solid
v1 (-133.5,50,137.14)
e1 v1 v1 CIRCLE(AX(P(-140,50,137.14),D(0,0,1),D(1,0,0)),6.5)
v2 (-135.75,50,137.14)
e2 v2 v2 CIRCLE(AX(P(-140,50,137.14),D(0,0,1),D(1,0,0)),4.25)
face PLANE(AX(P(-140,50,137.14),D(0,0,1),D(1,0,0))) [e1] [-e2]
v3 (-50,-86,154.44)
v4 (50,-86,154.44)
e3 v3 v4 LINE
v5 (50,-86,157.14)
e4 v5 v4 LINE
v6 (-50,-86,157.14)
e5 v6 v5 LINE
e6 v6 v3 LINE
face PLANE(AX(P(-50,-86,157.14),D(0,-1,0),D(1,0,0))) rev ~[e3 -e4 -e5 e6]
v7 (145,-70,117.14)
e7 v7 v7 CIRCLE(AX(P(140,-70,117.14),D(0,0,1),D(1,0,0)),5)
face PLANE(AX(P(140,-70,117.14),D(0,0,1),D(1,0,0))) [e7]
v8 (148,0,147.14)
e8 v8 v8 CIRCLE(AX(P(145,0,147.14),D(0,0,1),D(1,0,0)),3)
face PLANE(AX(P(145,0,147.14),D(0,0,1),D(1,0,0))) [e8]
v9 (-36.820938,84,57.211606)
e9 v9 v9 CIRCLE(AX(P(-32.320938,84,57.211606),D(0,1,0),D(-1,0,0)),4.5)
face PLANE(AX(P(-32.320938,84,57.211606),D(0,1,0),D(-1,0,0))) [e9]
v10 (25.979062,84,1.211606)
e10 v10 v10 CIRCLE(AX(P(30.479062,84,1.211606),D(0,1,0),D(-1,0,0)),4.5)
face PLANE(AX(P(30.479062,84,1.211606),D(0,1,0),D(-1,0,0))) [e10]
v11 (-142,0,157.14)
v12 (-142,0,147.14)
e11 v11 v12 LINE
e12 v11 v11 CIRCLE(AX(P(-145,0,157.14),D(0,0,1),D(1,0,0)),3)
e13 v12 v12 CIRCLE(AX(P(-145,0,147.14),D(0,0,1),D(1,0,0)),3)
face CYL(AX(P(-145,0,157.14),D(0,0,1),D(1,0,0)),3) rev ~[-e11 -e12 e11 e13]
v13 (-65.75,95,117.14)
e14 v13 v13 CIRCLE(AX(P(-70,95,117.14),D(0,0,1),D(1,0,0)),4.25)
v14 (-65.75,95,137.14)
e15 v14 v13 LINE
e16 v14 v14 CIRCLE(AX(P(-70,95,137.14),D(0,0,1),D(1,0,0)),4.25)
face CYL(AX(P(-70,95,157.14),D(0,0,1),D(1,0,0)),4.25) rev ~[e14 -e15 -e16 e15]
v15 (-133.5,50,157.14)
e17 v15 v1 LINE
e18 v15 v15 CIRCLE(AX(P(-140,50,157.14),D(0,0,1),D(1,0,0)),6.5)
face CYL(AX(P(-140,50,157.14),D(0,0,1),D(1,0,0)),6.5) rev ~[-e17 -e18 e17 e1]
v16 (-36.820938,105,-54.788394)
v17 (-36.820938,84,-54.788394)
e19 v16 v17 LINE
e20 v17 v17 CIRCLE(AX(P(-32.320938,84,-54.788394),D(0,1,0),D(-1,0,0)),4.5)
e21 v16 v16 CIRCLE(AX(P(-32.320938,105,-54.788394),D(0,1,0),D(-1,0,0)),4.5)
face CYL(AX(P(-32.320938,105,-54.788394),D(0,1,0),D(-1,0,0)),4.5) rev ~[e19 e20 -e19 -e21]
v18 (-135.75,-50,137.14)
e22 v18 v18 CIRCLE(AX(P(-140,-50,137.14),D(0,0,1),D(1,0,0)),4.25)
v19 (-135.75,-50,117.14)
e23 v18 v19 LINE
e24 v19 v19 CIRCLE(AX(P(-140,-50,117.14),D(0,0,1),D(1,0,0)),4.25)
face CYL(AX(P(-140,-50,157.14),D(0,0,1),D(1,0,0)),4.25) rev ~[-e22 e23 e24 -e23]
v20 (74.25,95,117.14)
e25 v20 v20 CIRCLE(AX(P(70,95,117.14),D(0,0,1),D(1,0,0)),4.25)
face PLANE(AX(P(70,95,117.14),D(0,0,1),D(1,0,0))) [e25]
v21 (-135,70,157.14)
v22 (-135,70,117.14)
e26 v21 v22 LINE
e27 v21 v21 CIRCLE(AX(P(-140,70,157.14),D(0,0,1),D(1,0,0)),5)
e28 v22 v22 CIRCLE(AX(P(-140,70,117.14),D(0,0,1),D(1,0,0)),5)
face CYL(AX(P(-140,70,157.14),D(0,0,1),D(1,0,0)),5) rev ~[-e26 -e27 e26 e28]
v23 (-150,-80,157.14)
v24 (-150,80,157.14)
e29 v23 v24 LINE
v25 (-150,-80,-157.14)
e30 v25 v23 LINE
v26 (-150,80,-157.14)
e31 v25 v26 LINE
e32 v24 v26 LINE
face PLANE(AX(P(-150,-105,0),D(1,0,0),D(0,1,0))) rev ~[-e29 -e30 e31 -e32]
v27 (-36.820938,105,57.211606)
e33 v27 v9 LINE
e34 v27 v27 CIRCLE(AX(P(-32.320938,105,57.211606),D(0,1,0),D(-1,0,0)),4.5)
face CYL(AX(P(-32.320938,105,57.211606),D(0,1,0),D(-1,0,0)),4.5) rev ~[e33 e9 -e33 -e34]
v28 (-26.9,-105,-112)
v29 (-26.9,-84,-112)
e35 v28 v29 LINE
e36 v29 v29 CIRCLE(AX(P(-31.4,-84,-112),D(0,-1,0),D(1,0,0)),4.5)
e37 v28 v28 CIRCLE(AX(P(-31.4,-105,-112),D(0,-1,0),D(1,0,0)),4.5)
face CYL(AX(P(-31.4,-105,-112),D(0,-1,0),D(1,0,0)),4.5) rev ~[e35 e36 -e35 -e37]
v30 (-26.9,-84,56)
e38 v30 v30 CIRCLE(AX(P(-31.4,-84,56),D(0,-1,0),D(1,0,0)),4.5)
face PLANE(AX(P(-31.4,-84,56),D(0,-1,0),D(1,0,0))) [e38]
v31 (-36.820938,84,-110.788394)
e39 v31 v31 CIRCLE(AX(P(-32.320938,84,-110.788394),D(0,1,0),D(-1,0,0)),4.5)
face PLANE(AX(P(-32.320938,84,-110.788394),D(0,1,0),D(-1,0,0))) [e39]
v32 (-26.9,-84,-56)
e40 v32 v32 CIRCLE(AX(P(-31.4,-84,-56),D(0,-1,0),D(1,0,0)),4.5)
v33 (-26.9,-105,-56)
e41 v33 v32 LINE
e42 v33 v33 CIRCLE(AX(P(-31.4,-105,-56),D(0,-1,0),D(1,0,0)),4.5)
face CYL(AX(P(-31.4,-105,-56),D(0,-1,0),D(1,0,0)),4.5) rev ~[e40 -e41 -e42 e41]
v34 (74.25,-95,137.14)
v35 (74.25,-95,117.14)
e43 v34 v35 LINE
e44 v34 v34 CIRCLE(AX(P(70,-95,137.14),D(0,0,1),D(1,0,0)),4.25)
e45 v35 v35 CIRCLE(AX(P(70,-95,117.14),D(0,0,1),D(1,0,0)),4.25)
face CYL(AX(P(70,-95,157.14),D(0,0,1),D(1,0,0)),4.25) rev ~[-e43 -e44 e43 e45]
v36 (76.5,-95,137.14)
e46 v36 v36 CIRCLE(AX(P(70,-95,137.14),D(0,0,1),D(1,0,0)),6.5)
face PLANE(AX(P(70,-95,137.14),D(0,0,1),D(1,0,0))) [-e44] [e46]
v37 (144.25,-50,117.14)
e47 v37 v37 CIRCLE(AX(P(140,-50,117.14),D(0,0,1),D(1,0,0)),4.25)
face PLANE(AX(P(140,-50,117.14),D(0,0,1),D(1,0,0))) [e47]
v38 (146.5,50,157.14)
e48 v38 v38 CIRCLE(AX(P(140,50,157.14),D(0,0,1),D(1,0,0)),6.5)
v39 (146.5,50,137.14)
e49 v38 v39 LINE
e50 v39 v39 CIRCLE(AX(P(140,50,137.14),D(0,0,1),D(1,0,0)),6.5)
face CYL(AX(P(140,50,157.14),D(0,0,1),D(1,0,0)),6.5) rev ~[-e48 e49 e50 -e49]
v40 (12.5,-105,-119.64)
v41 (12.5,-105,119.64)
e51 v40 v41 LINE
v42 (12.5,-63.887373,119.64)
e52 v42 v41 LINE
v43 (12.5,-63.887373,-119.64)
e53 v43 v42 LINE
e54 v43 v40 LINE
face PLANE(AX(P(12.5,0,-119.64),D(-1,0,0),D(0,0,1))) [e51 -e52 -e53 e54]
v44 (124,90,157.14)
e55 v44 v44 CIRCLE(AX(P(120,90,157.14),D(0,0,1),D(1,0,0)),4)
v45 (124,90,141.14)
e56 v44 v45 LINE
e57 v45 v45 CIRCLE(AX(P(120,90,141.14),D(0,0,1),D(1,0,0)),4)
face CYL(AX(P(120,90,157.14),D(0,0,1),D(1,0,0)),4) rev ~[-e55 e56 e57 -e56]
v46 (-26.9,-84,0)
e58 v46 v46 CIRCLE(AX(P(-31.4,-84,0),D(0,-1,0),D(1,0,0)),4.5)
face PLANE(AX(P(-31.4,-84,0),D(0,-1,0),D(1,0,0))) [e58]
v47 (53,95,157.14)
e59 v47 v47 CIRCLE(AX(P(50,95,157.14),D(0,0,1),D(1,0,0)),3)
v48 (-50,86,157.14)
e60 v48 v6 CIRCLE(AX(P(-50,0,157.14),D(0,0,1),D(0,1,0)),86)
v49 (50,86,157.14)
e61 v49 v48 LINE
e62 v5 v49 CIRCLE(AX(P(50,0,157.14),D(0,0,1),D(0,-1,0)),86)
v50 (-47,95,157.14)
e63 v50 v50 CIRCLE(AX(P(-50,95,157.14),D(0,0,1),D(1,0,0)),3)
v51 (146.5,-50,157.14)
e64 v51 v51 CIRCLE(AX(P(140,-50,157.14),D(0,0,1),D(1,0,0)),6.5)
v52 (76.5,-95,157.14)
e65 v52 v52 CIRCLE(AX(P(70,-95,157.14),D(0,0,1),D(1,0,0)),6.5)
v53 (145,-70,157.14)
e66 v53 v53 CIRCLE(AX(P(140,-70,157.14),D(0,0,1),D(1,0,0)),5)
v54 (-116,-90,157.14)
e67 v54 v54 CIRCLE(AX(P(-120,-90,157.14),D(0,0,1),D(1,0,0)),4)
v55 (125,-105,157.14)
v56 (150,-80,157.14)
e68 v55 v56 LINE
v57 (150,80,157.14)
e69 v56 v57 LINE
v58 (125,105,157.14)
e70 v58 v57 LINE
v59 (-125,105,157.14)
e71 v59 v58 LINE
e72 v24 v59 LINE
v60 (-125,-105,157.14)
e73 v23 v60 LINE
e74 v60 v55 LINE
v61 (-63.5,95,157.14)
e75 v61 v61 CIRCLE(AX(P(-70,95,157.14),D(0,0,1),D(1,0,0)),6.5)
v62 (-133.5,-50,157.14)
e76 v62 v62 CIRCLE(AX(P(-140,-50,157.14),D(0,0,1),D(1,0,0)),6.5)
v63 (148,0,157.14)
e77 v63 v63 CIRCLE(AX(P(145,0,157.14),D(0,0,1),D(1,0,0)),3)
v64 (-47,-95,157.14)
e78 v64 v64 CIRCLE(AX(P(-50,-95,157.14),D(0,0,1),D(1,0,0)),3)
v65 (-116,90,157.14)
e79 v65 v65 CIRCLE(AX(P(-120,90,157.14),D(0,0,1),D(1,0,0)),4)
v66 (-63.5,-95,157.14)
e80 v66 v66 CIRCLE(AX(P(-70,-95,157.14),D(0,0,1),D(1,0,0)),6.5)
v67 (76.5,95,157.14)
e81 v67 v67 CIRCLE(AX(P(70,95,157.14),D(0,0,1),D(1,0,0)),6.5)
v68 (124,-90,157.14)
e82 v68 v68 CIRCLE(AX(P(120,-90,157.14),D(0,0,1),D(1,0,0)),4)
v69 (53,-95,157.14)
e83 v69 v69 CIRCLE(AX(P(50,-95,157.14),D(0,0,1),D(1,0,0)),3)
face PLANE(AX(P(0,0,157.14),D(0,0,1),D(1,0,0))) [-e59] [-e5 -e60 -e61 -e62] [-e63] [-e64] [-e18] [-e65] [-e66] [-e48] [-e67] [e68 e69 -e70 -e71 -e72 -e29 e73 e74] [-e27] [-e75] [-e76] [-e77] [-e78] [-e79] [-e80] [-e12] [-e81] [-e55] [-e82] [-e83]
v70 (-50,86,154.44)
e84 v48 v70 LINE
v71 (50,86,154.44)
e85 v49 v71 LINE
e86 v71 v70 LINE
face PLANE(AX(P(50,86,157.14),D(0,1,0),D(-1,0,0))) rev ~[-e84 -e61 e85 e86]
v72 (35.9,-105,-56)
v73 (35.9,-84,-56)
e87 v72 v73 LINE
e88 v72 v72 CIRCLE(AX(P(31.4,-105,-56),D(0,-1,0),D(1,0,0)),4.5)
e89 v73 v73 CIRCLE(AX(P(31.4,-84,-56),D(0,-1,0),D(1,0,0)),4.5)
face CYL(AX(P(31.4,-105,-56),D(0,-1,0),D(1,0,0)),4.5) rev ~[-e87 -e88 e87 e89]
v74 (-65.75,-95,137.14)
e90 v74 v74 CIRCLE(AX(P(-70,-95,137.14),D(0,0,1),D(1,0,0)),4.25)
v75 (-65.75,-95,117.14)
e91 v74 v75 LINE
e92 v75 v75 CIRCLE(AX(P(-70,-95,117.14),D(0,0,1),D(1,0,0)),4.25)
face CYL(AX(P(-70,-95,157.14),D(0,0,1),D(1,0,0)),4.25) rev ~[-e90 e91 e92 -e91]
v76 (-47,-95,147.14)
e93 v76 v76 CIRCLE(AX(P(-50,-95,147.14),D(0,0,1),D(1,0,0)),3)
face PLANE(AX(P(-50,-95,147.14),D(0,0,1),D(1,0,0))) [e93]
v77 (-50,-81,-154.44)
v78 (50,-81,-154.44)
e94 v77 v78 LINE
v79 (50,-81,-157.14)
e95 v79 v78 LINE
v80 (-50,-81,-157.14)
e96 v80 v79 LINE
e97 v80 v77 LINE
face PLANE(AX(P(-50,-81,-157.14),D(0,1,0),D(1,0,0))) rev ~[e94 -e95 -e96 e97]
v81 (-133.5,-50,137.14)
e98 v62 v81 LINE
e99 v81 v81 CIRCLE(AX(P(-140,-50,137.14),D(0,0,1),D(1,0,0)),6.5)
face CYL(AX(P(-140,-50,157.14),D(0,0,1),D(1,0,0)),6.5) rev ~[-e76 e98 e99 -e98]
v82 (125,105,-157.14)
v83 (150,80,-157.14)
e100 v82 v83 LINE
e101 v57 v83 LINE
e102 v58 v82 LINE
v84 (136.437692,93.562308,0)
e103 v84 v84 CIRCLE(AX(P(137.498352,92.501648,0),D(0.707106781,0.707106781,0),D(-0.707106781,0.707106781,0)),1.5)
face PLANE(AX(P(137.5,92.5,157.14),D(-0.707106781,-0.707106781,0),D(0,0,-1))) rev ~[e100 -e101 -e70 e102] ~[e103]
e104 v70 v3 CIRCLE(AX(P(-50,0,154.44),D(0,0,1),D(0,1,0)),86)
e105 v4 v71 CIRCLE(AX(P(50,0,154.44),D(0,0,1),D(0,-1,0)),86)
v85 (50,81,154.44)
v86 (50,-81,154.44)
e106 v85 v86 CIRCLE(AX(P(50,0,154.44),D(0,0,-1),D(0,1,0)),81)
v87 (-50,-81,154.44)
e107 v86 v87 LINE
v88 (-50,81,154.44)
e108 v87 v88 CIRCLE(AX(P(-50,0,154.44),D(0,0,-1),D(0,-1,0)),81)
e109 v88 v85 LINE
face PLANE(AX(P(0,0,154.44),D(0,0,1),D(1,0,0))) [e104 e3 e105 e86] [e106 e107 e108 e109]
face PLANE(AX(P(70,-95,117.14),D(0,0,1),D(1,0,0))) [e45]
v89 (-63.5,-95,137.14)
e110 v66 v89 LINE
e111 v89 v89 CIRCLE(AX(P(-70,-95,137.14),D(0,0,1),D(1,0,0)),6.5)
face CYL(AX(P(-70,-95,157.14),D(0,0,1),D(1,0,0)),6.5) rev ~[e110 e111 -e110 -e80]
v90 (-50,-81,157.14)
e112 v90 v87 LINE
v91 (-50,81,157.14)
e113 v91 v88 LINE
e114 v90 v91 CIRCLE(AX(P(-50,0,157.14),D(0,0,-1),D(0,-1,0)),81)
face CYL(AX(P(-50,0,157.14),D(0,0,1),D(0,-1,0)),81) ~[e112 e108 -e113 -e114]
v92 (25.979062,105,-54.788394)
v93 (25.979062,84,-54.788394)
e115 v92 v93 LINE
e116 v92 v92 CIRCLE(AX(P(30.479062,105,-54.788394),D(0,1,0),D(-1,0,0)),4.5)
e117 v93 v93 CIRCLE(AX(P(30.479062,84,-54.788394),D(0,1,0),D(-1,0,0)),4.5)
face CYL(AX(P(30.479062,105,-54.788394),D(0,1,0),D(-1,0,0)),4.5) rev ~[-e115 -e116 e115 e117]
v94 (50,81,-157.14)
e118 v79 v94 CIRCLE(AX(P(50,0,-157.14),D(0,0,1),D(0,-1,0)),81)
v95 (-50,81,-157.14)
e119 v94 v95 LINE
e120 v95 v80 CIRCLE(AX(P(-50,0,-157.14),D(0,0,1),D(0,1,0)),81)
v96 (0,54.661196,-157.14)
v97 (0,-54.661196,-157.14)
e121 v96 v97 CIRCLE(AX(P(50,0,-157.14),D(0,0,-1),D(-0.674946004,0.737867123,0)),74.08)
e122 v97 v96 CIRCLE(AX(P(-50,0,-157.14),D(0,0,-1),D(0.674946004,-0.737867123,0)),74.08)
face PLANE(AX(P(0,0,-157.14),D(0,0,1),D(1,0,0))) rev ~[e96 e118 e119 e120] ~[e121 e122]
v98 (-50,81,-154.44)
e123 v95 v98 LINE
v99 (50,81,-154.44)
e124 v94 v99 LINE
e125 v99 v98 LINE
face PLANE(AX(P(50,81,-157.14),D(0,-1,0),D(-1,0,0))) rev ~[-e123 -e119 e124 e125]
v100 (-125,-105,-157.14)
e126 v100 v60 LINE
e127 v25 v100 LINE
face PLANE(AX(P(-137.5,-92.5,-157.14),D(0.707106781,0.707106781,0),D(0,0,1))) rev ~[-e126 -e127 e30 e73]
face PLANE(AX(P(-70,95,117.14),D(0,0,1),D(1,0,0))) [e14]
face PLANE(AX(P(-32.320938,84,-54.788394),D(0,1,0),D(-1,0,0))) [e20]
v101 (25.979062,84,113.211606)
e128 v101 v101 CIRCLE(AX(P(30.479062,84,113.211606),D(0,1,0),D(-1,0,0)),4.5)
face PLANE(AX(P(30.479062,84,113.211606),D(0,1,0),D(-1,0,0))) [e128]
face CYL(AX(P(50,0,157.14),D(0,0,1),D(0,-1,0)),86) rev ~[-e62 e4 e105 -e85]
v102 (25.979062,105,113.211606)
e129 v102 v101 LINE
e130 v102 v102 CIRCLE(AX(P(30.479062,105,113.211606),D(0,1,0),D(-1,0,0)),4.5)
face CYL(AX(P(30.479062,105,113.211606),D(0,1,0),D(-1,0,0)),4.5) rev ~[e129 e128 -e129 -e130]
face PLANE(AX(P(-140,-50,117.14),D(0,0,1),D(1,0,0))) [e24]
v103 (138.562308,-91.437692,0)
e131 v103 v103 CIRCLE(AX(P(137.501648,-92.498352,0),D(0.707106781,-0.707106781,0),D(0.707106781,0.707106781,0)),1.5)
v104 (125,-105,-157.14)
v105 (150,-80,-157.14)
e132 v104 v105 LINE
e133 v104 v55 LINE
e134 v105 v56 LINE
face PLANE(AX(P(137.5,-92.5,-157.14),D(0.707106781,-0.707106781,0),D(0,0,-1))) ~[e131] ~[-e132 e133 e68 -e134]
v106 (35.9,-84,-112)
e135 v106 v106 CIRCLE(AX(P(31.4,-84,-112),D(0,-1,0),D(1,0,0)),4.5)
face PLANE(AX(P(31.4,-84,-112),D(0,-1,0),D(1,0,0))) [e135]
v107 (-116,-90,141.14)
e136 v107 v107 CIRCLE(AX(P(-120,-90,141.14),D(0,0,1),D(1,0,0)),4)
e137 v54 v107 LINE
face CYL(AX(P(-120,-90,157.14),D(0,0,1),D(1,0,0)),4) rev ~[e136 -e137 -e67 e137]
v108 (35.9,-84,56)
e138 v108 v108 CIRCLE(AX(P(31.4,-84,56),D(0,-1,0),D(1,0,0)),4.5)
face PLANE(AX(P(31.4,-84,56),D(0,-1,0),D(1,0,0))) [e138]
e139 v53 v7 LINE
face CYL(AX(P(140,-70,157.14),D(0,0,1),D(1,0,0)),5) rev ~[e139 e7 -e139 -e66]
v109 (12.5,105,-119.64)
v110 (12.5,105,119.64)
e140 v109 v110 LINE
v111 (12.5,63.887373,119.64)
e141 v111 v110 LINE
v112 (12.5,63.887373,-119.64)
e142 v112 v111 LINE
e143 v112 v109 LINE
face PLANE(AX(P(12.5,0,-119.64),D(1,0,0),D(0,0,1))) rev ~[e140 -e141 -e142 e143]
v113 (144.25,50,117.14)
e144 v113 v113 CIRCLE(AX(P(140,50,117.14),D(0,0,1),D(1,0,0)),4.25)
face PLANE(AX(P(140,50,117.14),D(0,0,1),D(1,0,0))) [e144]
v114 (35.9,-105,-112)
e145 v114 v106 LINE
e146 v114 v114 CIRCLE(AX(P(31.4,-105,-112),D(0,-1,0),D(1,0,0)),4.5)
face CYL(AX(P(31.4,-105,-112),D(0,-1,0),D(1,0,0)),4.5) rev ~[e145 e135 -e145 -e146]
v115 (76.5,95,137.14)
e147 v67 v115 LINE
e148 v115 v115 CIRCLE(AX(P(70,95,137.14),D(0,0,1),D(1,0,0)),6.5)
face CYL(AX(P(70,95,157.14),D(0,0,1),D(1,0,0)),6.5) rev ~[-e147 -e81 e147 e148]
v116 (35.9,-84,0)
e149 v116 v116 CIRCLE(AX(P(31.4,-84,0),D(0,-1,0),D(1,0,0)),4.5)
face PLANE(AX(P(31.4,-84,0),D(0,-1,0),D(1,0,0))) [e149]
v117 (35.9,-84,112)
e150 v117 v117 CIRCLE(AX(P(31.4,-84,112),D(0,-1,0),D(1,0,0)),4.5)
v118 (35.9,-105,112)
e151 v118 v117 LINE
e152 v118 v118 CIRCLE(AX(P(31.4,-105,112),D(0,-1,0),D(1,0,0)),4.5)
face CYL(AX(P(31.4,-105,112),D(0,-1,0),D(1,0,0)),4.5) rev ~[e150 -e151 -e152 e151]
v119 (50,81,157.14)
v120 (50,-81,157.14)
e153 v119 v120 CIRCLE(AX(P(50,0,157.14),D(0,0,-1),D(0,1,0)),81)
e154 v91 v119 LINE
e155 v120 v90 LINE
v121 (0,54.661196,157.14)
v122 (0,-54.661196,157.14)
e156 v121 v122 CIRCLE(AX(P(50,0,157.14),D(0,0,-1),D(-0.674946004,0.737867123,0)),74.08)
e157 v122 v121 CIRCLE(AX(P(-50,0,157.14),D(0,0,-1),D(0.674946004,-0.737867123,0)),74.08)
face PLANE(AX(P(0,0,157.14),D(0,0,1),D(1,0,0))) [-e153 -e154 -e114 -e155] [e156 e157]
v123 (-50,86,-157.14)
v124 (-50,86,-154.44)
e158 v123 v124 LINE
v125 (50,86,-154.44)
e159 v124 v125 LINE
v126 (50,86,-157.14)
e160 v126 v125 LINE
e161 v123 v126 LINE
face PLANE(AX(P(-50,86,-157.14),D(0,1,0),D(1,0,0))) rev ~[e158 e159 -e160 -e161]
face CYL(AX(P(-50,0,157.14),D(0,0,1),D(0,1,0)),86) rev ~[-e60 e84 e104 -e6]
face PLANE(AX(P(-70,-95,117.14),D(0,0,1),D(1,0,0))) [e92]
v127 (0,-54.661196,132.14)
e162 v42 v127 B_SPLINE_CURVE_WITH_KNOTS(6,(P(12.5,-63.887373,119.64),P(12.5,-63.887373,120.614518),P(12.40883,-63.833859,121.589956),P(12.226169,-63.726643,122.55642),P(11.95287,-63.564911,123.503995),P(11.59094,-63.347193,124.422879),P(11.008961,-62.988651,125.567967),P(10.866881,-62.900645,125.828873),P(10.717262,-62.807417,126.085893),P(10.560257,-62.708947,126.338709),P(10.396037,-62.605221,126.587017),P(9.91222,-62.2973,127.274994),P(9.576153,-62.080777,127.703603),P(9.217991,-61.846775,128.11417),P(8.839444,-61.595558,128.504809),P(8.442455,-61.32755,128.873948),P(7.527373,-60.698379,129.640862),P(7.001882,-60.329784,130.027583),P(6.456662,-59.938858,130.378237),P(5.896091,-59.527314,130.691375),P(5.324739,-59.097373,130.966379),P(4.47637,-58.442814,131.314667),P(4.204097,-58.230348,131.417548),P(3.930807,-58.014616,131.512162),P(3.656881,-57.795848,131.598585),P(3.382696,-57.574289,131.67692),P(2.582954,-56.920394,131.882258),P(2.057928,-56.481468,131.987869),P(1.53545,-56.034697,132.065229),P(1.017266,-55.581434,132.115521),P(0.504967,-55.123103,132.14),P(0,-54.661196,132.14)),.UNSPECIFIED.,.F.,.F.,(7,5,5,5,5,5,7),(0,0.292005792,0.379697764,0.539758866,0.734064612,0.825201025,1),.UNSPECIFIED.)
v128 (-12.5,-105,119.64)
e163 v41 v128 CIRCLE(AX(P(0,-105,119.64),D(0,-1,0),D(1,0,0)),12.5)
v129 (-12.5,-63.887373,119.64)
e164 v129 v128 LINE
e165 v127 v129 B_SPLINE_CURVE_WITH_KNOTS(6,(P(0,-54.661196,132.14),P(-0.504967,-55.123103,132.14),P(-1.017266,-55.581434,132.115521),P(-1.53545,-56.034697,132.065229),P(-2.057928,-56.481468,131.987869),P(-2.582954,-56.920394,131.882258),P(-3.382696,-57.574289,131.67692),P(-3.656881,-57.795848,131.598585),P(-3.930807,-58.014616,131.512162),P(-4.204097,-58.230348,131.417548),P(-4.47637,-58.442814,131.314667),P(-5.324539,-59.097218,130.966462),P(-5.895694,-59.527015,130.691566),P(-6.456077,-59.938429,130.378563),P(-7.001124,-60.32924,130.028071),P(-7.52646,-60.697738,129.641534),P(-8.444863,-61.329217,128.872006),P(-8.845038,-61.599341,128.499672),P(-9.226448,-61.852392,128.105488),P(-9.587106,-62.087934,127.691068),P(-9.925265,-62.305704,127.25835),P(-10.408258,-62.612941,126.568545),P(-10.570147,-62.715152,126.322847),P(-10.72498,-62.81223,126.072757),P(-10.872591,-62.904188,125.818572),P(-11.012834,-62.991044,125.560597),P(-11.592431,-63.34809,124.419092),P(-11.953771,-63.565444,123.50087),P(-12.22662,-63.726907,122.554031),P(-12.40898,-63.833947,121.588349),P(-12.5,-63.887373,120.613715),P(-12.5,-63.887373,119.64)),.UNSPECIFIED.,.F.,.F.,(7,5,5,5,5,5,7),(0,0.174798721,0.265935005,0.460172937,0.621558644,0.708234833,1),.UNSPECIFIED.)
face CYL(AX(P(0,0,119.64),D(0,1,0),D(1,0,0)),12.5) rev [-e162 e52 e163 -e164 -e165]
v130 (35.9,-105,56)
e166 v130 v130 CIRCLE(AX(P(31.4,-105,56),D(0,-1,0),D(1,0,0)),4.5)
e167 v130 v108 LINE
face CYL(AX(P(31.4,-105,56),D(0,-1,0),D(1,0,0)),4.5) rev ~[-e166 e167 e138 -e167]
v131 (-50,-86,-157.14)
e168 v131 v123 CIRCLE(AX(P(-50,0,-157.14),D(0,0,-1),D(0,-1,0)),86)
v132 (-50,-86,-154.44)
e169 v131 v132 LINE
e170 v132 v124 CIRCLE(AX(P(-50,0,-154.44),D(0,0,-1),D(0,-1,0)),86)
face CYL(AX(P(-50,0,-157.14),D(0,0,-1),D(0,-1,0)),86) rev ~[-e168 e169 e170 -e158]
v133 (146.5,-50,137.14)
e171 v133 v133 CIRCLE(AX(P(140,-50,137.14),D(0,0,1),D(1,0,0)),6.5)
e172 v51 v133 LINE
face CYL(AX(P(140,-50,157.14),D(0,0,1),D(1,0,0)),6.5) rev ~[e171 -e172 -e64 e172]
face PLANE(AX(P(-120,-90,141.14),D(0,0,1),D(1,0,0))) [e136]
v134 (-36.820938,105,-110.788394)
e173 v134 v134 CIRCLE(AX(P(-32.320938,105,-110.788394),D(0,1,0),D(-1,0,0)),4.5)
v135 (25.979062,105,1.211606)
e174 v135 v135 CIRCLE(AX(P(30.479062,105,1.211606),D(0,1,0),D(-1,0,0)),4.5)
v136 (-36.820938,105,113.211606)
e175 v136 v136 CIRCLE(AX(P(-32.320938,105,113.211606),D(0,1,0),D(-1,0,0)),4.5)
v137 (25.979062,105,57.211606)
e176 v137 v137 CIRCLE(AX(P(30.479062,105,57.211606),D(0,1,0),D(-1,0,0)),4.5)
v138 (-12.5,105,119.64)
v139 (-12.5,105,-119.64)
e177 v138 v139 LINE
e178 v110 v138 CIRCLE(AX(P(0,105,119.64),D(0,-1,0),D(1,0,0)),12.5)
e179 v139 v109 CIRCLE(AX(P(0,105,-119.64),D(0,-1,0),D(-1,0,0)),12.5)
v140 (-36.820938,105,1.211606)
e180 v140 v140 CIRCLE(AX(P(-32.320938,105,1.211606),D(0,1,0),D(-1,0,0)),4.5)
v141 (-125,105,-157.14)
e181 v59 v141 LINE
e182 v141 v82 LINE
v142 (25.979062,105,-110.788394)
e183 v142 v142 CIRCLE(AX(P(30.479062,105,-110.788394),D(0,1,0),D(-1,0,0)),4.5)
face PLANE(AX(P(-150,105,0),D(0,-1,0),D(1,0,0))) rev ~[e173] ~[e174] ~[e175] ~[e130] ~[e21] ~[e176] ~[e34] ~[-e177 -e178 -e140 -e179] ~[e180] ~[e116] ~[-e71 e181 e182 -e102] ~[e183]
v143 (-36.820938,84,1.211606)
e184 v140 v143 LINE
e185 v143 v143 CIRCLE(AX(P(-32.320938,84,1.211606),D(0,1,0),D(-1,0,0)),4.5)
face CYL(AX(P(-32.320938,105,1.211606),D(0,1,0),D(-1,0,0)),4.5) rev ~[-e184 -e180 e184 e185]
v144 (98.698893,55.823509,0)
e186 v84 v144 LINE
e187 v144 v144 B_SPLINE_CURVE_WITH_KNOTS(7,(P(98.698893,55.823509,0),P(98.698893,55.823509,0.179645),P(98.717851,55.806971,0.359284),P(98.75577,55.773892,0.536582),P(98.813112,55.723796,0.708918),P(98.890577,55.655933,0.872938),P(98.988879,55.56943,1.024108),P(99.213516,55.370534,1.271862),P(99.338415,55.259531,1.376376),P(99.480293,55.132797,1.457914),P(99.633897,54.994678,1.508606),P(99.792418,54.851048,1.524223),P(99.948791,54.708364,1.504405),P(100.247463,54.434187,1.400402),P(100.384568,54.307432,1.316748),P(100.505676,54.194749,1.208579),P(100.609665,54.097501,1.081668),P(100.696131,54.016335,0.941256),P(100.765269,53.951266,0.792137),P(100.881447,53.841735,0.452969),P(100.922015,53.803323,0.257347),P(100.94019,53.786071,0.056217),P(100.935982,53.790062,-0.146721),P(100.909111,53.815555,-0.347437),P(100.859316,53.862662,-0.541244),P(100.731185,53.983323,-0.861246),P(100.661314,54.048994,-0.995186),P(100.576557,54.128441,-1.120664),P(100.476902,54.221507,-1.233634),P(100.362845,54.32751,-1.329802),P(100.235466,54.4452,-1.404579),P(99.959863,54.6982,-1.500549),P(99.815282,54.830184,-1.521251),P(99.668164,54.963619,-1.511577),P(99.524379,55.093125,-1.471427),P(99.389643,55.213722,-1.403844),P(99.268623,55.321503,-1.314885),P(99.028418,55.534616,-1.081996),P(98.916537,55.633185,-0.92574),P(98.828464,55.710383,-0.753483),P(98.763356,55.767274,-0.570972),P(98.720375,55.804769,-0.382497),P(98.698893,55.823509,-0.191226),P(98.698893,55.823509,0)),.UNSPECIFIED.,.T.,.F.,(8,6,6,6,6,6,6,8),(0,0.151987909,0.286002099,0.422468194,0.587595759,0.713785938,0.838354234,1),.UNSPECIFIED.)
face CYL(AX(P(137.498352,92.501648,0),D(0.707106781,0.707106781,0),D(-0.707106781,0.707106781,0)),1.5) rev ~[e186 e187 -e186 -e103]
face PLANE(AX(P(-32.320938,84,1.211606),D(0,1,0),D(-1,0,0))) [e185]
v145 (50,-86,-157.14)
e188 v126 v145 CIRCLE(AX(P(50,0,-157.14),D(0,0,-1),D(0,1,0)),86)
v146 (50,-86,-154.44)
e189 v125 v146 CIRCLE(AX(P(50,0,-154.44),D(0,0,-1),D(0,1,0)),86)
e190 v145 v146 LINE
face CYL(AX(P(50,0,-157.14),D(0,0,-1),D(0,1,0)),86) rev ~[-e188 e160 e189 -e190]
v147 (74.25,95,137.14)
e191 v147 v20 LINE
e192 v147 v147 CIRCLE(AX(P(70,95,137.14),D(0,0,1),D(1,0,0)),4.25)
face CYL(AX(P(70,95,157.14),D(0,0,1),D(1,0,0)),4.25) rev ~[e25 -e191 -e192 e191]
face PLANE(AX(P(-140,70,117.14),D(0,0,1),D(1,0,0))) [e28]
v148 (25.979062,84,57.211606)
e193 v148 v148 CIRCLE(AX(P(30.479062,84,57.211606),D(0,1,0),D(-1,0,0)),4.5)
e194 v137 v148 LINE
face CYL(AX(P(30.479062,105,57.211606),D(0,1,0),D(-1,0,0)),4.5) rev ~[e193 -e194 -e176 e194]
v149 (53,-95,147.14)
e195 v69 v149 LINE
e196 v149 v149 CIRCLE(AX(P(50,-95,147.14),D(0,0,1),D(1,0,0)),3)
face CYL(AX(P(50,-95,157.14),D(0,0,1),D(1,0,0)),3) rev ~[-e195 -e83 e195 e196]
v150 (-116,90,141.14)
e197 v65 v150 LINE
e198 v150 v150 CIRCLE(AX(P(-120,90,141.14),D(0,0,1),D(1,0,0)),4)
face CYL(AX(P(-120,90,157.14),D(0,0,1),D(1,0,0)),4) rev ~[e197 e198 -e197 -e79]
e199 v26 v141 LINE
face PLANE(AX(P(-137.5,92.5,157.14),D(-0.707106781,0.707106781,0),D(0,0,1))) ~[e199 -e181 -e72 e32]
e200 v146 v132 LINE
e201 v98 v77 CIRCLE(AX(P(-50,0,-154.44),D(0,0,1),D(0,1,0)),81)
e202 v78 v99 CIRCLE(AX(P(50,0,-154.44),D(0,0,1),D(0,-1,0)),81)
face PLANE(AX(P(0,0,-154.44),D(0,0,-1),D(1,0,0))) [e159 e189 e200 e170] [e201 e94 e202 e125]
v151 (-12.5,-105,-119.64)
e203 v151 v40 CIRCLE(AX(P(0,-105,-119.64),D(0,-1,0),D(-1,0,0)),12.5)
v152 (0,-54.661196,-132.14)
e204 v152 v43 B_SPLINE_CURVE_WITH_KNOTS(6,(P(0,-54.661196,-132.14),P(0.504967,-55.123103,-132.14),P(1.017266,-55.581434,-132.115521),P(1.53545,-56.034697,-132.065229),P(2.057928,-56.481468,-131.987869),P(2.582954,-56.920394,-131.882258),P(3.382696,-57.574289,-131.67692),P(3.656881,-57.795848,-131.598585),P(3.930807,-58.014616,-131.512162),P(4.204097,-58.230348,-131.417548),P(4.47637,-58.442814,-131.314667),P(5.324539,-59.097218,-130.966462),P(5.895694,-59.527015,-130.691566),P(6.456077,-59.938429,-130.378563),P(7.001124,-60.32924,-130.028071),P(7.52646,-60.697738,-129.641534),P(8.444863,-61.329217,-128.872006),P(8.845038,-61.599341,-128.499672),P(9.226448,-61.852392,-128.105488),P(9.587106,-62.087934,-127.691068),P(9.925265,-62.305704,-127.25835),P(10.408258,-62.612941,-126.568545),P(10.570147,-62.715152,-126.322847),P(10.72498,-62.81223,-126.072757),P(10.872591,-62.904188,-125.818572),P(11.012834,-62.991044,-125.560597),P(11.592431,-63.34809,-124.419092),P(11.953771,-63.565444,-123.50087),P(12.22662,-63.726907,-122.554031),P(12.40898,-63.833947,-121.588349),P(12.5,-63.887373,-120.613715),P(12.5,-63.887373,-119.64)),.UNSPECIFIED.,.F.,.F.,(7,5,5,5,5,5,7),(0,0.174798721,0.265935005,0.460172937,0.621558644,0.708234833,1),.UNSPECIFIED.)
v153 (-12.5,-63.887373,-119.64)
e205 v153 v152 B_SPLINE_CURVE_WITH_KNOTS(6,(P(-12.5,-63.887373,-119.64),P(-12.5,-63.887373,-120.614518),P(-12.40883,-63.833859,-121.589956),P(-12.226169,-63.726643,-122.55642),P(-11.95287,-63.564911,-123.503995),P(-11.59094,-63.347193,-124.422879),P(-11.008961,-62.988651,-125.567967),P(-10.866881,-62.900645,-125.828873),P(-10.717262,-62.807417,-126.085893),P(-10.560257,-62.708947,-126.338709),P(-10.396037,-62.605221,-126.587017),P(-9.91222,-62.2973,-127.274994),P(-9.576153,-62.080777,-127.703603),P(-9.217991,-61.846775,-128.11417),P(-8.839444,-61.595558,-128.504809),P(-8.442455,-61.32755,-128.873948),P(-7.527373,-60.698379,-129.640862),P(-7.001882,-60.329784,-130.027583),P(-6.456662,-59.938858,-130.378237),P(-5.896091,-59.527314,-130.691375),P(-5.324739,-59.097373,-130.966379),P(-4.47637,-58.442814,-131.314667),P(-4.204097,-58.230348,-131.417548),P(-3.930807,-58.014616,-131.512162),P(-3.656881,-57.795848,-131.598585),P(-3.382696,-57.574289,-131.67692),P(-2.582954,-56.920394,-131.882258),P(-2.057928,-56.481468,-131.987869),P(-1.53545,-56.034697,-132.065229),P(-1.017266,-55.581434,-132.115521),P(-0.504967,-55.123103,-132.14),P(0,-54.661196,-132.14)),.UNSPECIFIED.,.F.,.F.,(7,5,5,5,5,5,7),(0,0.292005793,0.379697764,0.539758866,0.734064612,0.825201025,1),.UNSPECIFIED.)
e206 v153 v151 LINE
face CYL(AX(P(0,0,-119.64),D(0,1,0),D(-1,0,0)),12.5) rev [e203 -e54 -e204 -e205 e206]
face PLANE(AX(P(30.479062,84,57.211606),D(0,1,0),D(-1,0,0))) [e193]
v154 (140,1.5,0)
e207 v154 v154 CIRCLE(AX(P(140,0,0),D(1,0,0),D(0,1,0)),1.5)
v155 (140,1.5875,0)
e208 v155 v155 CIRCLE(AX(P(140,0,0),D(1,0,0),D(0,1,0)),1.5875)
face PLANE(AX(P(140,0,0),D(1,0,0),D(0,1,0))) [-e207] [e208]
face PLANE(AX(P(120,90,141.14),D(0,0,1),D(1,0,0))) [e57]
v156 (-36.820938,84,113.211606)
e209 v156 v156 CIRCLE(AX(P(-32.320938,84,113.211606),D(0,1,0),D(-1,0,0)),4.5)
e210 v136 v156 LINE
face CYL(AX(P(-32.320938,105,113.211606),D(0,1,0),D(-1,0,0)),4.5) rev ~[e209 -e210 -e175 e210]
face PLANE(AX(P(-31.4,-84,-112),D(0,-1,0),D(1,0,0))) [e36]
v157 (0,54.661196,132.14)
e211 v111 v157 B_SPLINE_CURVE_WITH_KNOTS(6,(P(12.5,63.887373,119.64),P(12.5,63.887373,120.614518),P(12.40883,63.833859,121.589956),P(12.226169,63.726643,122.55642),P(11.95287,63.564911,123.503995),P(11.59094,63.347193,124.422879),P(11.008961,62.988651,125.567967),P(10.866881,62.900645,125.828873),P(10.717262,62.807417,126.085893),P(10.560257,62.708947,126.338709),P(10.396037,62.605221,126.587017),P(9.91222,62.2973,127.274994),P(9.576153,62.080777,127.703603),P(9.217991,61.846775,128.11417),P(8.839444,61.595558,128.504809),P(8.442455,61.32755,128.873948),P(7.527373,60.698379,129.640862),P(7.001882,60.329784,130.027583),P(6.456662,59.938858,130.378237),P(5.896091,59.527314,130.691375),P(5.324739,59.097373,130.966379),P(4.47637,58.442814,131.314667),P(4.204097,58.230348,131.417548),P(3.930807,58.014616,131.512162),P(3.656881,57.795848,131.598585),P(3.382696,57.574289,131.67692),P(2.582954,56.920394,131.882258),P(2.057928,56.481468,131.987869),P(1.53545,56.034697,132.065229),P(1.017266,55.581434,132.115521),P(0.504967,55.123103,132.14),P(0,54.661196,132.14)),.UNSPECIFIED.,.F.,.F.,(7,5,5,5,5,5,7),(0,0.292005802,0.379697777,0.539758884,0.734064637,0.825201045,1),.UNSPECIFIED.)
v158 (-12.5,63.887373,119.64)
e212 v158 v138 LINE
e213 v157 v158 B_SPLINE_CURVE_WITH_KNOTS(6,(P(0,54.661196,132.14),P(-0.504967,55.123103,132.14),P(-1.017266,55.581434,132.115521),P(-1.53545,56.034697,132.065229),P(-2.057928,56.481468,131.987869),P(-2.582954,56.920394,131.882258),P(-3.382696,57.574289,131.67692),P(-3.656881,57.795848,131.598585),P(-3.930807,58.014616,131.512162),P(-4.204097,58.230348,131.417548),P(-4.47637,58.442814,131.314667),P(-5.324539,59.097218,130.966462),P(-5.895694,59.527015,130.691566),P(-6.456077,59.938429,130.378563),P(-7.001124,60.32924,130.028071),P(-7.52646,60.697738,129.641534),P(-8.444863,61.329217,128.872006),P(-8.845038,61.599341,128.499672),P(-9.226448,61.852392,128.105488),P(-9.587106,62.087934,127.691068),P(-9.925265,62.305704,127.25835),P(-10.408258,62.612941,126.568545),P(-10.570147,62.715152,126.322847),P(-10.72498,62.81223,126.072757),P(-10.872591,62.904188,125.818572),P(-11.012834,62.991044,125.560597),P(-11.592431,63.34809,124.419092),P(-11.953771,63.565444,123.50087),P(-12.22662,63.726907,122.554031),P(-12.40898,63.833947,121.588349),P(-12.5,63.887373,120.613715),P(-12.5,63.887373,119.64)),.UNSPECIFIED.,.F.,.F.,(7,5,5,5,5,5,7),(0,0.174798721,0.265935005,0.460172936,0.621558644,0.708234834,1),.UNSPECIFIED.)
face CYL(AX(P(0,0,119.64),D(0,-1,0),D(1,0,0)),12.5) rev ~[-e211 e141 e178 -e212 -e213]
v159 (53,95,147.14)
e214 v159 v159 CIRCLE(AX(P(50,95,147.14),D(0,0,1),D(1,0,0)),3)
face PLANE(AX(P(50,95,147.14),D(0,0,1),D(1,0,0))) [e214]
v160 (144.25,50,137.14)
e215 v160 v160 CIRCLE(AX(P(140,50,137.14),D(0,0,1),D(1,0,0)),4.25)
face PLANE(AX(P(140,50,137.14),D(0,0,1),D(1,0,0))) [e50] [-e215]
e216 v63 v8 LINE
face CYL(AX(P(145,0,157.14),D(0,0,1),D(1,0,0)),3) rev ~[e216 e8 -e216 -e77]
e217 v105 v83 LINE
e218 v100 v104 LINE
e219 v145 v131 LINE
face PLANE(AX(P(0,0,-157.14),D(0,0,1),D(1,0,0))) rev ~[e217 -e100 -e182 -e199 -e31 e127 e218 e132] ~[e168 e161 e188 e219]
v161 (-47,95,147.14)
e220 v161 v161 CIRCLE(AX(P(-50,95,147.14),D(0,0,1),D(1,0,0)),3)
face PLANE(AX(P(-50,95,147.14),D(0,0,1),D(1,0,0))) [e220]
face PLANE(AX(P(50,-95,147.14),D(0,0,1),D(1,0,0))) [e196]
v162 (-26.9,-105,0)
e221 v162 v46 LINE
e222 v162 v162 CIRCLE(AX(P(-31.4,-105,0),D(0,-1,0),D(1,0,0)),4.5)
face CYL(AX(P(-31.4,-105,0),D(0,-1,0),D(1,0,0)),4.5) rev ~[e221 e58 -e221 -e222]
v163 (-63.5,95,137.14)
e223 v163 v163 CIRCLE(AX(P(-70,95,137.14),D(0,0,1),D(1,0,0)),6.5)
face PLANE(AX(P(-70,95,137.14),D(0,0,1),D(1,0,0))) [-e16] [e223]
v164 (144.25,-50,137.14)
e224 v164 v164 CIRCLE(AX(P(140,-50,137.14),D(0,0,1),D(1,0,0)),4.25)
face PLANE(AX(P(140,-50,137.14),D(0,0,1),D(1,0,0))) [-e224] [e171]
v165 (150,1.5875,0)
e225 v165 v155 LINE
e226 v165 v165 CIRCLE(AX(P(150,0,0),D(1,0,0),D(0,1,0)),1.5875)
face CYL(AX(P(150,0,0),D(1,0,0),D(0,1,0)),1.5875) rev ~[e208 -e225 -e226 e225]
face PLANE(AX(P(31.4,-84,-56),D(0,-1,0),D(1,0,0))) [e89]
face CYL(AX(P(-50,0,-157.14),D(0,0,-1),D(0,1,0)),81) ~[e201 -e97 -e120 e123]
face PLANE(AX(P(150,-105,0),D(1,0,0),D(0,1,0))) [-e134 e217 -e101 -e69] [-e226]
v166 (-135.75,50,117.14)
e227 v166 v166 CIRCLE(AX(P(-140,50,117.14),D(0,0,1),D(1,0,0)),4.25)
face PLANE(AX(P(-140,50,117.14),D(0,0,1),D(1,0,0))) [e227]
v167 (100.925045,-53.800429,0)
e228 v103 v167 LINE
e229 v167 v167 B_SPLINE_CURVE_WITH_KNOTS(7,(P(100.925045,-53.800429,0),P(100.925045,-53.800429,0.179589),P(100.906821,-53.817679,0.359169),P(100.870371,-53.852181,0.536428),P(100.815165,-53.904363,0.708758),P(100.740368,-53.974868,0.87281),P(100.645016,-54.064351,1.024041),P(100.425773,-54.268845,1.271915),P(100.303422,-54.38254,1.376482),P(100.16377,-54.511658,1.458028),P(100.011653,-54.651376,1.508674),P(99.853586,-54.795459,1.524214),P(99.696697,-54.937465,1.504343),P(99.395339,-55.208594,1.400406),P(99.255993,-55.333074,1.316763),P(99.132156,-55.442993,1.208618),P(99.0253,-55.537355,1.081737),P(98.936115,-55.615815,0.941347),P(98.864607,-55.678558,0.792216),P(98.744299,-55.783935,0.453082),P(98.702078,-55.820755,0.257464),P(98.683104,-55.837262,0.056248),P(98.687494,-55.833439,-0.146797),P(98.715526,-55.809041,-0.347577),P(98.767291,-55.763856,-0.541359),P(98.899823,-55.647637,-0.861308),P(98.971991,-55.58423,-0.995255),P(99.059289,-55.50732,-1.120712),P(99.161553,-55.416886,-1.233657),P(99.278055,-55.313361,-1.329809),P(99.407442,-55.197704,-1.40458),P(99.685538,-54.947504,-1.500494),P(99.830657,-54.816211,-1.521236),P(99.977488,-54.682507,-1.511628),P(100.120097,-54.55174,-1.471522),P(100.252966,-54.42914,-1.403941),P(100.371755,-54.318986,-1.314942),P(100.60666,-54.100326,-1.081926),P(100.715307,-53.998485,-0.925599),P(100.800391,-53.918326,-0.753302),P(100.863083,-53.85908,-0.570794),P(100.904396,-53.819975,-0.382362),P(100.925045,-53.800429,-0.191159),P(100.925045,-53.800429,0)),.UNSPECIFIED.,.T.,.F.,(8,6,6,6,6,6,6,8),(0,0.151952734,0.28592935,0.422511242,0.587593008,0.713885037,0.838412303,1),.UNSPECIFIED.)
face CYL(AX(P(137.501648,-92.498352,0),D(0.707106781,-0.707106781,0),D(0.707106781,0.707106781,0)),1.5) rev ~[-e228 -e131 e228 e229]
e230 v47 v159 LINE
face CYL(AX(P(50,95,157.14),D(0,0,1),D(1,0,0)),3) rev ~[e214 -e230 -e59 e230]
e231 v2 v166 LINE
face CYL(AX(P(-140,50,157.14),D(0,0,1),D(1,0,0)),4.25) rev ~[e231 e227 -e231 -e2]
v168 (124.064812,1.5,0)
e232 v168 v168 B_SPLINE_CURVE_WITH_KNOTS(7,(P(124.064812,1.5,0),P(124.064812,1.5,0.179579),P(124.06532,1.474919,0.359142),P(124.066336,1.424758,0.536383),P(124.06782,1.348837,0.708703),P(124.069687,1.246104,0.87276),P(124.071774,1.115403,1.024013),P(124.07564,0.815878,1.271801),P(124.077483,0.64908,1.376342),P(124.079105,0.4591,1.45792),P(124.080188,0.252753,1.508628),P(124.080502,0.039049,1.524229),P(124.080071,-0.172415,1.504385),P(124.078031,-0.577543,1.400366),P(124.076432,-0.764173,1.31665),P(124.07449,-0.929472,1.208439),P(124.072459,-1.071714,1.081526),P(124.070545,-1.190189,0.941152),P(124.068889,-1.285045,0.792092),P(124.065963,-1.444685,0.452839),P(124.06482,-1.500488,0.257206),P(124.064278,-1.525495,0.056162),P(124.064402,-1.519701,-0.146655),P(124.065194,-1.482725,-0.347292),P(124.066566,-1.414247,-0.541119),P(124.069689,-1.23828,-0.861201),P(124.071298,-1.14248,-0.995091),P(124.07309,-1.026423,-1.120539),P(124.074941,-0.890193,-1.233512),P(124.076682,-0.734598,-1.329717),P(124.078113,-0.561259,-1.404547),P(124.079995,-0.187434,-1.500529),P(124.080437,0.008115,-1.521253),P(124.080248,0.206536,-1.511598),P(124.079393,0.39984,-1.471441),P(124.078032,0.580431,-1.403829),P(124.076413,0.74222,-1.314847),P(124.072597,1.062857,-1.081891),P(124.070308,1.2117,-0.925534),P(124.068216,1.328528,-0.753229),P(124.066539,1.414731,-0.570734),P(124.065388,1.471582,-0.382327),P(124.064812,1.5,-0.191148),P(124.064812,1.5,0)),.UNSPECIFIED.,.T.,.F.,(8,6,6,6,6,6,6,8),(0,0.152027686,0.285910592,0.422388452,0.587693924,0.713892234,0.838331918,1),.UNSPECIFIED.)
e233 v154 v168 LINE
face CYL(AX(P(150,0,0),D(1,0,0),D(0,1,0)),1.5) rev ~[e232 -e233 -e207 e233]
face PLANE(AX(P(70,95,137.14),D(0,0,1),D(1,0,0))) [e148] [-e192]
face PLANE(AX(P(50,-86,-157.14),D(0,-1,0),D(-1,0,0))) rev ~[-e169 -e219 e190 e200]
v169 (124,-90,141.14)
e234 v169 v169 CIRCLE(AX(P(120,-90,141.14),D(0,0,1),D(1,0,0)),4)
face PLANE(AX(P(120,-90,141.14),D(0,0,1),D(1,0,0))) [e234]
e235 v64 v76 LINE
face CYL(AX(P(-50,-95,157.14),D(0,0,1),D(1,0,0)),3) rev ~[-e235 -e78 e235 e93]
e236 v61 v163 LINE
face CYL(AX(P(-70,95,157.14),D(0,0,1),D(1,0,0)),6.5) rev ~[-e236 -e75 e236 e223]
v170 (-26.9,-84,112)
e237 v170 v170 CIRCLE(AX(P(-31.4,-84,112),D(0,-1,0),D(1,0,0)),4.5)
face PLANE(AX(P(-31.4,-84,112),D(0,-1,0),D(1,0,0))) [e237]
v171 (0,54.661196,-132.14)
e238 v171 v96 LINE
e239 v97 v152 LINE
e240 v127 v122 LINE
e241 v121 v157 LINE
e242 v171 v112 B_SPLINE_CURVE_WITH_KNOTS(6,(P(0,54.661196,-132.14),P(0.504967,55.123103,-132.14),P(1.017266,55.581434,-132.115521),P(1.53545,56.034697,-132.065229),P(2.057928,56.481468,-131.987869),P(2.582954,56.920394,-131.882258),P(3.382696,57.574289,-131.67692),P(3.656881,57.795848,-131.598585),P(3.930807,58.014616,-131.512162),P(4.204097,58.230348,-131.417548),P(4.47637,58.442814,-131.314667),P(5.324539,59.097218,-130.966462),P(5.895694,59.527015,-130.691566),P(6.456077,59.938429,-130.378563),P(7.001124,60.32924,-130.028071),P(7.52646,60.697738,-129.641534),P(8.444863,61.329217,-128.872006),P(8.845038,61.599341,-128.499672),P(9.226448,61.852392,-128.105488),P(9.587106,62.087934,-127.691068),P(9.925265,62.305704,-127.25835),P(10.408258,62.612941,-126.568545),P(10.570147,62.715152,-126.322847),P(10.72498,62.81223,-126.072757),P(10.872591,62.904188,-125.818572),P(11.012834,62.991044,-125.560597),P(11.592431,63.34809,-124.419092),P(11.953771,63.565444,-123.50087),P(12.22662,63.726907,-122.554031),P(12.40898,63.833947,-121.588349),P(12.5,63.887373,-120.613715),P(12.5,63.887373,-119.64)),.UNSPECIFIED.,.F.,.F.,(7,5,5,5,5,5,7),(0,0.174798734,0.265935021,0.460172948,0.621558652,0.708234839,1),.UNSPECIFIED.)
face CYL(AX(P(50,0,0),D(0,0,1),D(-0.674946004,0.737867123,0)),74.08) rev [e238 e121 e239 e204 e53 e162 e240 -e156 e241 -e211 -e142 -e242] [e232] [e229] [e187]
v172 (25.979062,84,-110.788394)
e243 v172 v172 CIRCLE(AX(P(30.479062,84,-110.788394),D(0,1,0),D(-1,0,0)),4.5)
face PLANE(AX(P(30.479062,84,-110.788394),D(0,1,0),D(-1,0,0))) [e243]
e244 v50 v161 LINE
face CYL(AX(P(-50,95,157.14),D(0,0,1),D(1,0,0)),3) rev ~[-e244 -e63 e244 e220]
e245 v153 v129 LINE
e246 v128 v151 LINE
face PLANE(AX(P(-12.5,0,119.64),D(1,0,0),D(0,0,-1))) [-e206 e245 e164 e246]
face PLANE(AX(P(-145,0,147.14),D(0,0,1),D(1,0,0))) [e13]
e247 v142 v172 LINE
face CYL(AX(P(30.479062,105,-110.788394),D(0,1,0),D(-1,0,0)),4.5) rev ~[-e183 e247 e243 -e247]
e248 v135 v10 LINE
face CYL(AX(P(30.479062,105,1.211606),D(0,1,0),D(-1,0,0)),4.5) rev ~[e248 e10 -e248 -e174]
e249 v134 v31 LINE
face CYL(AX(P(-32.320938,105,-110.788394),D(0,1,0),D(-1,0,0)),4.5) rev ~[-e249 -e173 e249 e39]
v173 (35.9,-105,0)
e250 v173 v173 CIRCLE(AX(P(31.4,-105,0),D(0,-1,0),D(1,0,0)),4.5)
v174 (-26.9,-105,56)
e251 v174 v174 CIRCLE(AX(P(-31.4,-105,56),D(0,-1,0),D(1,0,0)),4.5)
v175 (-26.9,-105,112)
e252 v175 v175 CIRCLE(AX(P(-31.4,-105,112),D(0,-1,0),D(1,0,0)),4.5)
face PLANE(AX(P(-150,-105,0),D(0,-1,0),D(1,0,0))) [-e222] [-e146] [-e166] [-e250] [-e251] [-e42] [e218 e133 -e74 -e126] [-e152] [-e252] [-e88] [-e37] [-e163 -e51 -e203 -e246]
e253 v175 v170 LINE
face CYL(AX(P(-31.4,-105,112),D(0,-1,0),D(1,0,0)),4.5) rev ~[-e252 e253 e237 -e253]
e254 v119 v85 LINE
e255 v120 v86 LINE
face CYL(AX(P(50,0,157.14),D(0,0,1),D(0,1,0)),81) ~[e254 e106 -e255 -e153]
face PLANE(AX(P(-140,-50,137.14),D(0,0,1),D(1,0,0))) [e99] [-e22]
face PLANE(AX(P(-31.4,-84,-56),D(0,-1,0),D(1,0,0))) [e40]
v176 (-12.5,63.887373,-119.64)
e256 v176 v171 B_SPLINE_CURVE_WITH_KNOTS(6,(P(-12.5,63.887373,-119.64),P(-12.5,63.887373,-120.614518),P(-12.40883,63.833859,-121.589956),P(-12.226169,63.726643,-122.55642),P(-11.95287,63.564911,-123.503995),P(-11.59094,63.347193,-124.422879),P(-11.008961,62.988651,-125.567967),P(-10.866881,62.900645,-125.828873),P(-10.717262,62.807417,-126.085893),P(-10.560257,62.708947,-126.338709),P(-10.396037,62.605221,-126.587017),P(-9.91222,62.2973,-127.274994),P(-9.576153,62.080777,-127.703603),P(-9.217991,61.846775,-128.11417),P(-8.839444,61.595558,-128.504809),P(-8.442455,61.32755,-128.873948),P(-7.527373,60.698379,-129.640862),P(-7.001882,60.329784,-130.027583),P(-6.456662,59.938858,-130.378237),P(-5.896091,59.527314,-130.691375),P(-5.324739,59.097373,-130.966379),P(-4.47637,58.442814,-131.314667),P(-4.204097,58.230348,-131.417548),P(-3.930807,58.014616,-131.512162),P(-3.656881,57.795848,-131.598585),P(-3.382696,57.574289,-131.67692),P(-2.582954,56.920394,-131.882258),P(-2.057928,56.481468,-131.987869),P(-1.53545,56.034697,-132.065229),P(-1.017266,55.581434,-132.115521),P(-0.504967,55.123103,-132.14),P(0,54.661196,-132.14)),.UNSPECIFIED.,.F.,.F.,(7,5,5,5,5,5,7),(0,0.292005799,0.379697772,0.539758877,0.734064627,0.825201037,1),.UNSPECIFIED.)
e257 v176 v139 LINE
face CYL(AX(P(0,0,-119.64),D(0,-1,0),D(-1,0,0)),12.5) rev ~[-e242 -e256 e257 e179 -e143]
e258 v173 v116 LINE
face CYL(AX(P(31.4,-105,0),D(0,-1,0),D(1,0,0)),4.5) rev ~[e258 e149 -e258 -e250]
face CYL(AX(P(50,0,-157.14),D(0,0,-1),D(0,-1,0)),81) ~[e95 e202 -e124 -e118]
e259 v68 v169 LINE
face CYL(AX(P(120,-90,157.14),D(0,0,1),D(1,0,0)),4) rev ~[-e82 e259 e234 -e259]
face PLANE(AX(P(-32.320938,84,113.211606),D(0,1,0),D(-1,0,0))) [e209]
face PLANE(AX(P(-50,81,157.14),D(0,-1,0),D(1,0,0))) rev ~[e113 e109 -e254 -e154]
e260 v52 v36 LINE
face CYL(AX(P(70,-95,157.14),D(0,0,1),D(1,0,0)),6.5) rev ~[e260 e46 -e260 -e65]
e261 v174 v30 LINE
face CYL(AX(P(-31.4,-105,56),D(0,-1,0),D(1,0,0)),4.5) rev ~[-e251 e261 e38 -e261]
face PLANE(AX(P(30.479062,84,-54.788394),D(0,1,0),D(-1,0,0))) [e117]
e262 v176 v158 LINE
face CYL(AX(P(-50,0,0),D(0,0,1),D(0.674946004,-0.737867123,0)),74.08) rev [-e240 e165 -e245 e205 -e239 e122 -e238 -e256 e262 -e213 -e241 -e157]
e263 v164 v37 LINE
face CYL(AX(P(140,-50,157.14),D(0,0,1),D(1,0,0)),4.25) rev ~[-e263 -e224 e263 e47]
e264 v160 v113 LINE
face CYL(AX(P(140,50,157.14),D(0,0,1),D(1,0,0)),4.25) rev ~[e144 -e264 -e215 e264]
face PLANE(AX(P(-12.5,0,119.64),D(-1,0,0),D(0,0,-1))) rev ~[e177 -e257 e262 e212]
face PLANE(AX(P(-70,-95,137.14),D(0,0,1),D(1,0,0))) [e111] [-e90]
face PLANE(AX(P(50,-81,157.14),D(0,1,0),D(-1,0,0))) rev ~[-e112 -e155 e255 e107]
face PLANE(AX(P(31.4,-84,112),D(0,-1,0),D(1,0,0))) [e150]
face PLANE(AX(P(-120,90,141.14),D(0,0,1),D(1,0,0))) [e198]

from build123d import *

# Parameters (mm, degrees)
F0_W          = 300
F0_H          = 210
F1_DEPTH      = 157.14
F1_DEPTH_BACK = 157.14
F3_DEPTH      = 105
F3_DEPTH_BACK = 105
F4_R          = 4.5
F5_DEPTH      = 21
F6_R          = 6.5
F6_R_2        = 4.25
F7_DEPTH      = 20
F6_R_3        = 3
F8_DEPTH      = 10
F6_R_4        = 5
F9_DEPTH      = 40
F6_R_5        = 4
F10_DEPTH     = 16
F11_SIZE      = 25
F12_R         = 1.5875
F12_R_2       = 1.5
F13_DEPTH     = 10
F14_DEPTH     = 40
F15_R         = 1.5
F16_DEPTH     = 70
F17_R         = 1.5
F18_DEPTH     = 70
F20_DEPTH     = 2.7
F22_DEPTH     = 2.7
F23_R         = 4.5
F24_DEPTH     = 21


# Not quite as in the source:
# - a feature names something its author has since deleted; it is built from what else it names


with BuildPart() as f1:
    # F0 (on Top) → F1 (new body, two sides)
    with BuildSketch(Plane.XY) as f1_sk:
        Rectangle(F0_W, F0_H)
        with BuildLine():
            ThreePointArc((-50, -86), (-136, 0), (-50, 86))
            Line((-50, 86), (50, 86))
            ThreePointArc((50, 86), (136, 0), (50, -86))
            Line((50, -86), (-50, -86))
        make_face(mode=Mode.SUBTRACT)
        with BuildLine():
            Line((50, 86), (-50, 86))
            ThreePointArc((-50, 86), (-136, 0), (-50, -86))
            Line((-50, -86), (50, -86))
            ThreePointArc((50, -86), (136, 0), (50, 86))
        make_face()
        with BuildLine():
            ThreePointArc((-50, -81), (-131, 0), (-50, 81))
            Line((-50, 81), (50, 81))
            ThreePointArc((50, 81), (131, 0), (50, -81))
            Line((50, -81), (-50, -81))
        make_face(mode=Mode.SUBTRACT)
        with BuildLine():
            Line((50, 81), (-50, 81))
            ThreePointArc((-50, 81), (-131, 0), (-50, -81))
            Line((-50, -81), (50, -81))
            ThreePointArc((50, -81), (131, 0), (50, 81))
        make_face()
        with BuildLine():
            ThreePointArc((0, -54.6611964743), (-124.08, 0), (0, 54.6611964743))
            ThreePointArc((0, 54.6611964743), (124.08, 0), (0, -54.6611964743))
        make_face(mode=Mode.SUBTRACT)
    extrude(amount=F1_DEPTH)
    extrude(f1_sk.sketch, amount=-F1_DEPTH_BACK)

    # F2 (on Front) → F3 (cut, two sides)
    with BuildSketch(Plane.XZ) as f3_sk:
        with BuildLine():
            ThreePointArc((12.5, 119.64), (0, 132.14), (-12.5, 119.64))
            Line((-12.5, 119.64), (-12.5, -119.64))
            ThreePointArc((-12.5, -119.64), (0, -132.14), (12.5, -119.64))
            Line((12.5, -119.64), (12.5, 119.64))
        make_face()
    extrude(amount=-F3_DEPTH, mode=Mode.SUBTRACT)
    extrude(f3_sk.sketch, amount=F3_DEPTH_BACK, mode=Mode.SUBTRACT)

    # F4 (on face) → F5 (cut)
    with BuildSketch(Plane.XZ.offset(105)):
        with Locations((-31.4, 112)):
            Circle(F4_R)
        with Locations((-31.4, 56)):
            Circle(F4_R)
        with Locations((-31.4, 0)):
            Circle(F4_R)
        with Locations((-31.4, -56)):
            Circle(F4_R)
        with Locations((-31.4, -112)):
            Circle(F4_R)
        with Locations((31.4, -112)):
            Circle(F4_R)
        with Locations((31.4, -56)):
            Circle(F4_R)
        with Locations((31.4, 0)):
            Circle(F4_R)
        with Locations((31.4, 56)):
            Circle(F4_R)
        with Locations((31.4, 112)):
            Circle(F4_R)
    extrude(amount=-F5_DEPTH, mode=Mode.SUBTRACT)

    # F6 (on face) → F7 (cut)
    with BuildSketch(Plane.XY.offset(157.14)):
        with Locations((140, 50)):
            Circle(F6_R)
        with Locations((140, 50)):
            Circle(F6_R_2, mode=Mode.SUBTRACT)
        with Locations((140, -50)):
            Circle(F6_R)
        with Locations((140, -50)):
            Circle(F6_R_2, mode=Mode.SUBTRACT)
        with Locations((70, -95)):
            Circle(F6_R)
        with Locations((70, -95)):
            Circle(F6_R_2, mode=Mode.SUBTRACT)
        with Locations((-70, -95)):
            Circle(F6_R)
        with Locations((-70, -95)):
            Circle(F6_R_2, mode=Mode.SUBTRACT)
        with Locations((-140, -50)):
            Circle(F6_R)
        with Locations((-140, -50)):
            Circle(F6_R_2, mode=Mode.SUBTRACT)
        with Locations((-140, 50)):
            Circle(F6_R)
        with Locations((-140, 50)):
            Circle(F6_R_2, mode=Mode.SUBTRACT)
        with Locations((-70, 95)):
            Circle(F6_R)
        with Locations((-70, 95)):
            Circle(F6_R_2, mode=Mode.SUBTRACT)
        with Locations((70, 95)):
            Circle(F6_R)
        with Locations((70, 95)):
            Circle(F6_R_2, mode=Mode.SUBTRACT)
    extrude(amount=-F7_DEPTH, mode=Mode.SUBTRACT)

    # F6 (on face) → F8 (cut)
    with BuildSketch(Plane.XY.offset(157.14)):
        with Locations((-50, 95)):
            Circle(F6_R_3)
        with Locations((-145, 0)):
            Circle(F6_R_3)
        with Locations((50, 95)):
            Circle(F6_R_3)
        with Locations((145, 0)):
            Circle(F6_R_3)
        with Locations((-50, -95)):
            Circle(F6_R_3)
        with Locations((50, -95)):
            Circle(F6_R_3)
    extrude(amount=-F8_DEPTH, mode=Mode.SUBTRACT)

    # F6 (on face) → F9 (cut)
    with BuildSketch(Plane.XY.offset(157.14)):
        with Locations((-70, 95)):
            Circle(F6_R_2)
        with Locations((-140, 50)):
            Circle(F6_R_2)
        with Locations((-140, -50)):
            Circle(F6_R_2)
        with Locations((-70, -95)):
            Circle(F6_R_2)
        with Locations((70, -95)):
            Circle(F6_R_2)
        with Locations((140, -50)):
            Circle(F6_R_2)
        with Locations((140, 50)):
            Circle(F6_R_2)
        with Locations((70, 95)):
            Circle(F6_R_2)
        with Locations((-140, 70)):
            Circle(F6_R_4)
        with Locations((140, -70)):
            Circle(F6_R_4)
    extrude(amount=-F9_DEPTH, mode=Mode.SUBTRACT)

    # F6 (on face) → F10 (cut)
    with BuildSketch(Plane.XY.offset(157.14)):
        with Locations((-120, 90)):
            Circle(F6_R_5)
        with Locations((-120, -90)):
            Circle(F6_R_5)
        with Locations((120, -90)):
            Circle(F6_R_5)
        with Locations((120, 90)):
            Circle(F6_R_5)
    extrude(amount=-F10_DEPTH, mode=Mode.SUBTRACT)

    # F11
    f11_edges = [f1.edges().sort_by_distance(p)[0] for p in [
        (-150, 105, 0),
        (-150, -105, 0),
        (150, 105, 0),
        (150, -105, 0),
    ]]
    chamfer(f11_edges, length=F11_SIZE)

    # F12 (on face) → F13 (cut)
    with BuildSketch(Plane.YZ.offset(150)):
        Circle(F12_R)
        Circle(F12_R_2, mode=Mode.SUBTRACT)
    extrude(amount=-F13_DEPTH, mode=Mode.SUBTRACT)

    # F14 (cut): a face of the model
    f14_faces = [f1.faces().sort_by_distance(p)[0] for p in [
        (150, 0, 0),
    ]]
    extrude(f14_faces, amount=-F14_DEPTH, mode=Mode.SUBTRACT)

    # F15 (on face) → F16 (cut)
    with BuildSketch(Plane(origin=(115, -115, 0), x_dir=(0.7071067812, 0.7071067812, 0), z_dir=(0.7071067812, -0.7071067812, 0))):
        with Locations((31.8221356237, 0)):
            Circle(F15_R)
    extrude(amount=-F16_DEPTH, mode=Mode.SUBTRACT)

    # F17 (on face) → F18 (cut)
    with BuildSketch(Plane(origin=(115, 115, 0), x_dir=(-0.7071067812, 0.7071067812, 0), z_dir=(0.7071067812, 0.7071067812, 0))):
        with Locations((-31.8174746831, 0)):
            Circle(F17_R)
    extrude(amount=-F18_DEPTH, mode=Mode.SUBTRACT)

    # F19 (on face) → F20 (cut)
    with BuildSketch(Plane.XY.offset(157.14)):
        with BuildLine():
            Line((-50, -86), (50, -86))
            ThreePointArc((50, -86), (136, 0), (50, 86))
            Line((50, 86), (-50, 86))
            ThreePointArc((-50, 86), (-136, 0), (-50, -86))
        make_face()
        with BuildLine():
            ThreePointArc((50, 81), (131, 0), (50, -81))
            Line((50, -81), (-50, -81))
            ThreePointArc((-50, -81), (-131, 0), (-50, 81))
            Line((-50, 81), (50, 81))
        make_face(mode=Mode.SUBTRACT)
    extrude(amount=-F20_DEPTH, mode=Mode.SUBTRACT)

    # F21 (on face) → F22 (cut)
    with BuildSketch(Plane(origin=(0, 0, -157.14), x_dir=(1, 0, 0), z_dir=(0, 0, -1))):
        with BuildLine():
            Line((50, 86), (-50, 86))
            ThreePointArc((-50, 86), (-136, 0), (-50, -86))
            Line((-50, -86), (50, -86))
            ThreePointArc((50, -86), (136, 0), (50, 86))
        make_face()
        with BuildLine():
            ThreePointArc((-50, -81), (-131, 0), (-50, 81))
            Line((-50, 81), (50, 81))
            ThreePointArc((50, 81), (131, 0), (50, -81))
            Line((50, -81), (-50, -81))
        make_face(mode=Mode.SUBTRACT)
    extrude(amount=-F22_DEPTH, mode=Mode.SUBTRACT)

    # F23 (on face) → F24 (cut)
    with BuildSketch(Plane(origin=(0, 105, 0), x_dir=(-1, 0, 0), z_dir=(0, 1, 0))):
        with Locations((32.3209376876, -110.7883939175)):
            Circle(F23_R)
        with Locations((-30.4790623124, -110.7883939175)):
            Circle(F23_R)
        with Locations((32.3209376876, -54.7883939175)):
            Circle(F23_R)
        with Locations((32.3209376876, 1.2116060825)):
            Circle(F23_R)
        with Locations((32.3209376876, 57.2116060825)):
            Circle(F23_R)
        with Locations((32.3209376876, 113.2116060825)):
            Circle(F23_R)
        with Locations((-30.4790623124, 113.2116060825)):
            Circle(F23_R)
        with Locations((-30.4790623124, 57.2116060825)):
            Circle(F23_R)
        with Locations((-30.4790623124, 1.2116060825)):
            Circle(F23_R)
        with Locations((-30.4790623124, -54.7883939175)):
            Circle(F23_R)
    extrude(amount=-F24_DEPTH, mode=Mode.SUBTRACT)


solid = f1.part
